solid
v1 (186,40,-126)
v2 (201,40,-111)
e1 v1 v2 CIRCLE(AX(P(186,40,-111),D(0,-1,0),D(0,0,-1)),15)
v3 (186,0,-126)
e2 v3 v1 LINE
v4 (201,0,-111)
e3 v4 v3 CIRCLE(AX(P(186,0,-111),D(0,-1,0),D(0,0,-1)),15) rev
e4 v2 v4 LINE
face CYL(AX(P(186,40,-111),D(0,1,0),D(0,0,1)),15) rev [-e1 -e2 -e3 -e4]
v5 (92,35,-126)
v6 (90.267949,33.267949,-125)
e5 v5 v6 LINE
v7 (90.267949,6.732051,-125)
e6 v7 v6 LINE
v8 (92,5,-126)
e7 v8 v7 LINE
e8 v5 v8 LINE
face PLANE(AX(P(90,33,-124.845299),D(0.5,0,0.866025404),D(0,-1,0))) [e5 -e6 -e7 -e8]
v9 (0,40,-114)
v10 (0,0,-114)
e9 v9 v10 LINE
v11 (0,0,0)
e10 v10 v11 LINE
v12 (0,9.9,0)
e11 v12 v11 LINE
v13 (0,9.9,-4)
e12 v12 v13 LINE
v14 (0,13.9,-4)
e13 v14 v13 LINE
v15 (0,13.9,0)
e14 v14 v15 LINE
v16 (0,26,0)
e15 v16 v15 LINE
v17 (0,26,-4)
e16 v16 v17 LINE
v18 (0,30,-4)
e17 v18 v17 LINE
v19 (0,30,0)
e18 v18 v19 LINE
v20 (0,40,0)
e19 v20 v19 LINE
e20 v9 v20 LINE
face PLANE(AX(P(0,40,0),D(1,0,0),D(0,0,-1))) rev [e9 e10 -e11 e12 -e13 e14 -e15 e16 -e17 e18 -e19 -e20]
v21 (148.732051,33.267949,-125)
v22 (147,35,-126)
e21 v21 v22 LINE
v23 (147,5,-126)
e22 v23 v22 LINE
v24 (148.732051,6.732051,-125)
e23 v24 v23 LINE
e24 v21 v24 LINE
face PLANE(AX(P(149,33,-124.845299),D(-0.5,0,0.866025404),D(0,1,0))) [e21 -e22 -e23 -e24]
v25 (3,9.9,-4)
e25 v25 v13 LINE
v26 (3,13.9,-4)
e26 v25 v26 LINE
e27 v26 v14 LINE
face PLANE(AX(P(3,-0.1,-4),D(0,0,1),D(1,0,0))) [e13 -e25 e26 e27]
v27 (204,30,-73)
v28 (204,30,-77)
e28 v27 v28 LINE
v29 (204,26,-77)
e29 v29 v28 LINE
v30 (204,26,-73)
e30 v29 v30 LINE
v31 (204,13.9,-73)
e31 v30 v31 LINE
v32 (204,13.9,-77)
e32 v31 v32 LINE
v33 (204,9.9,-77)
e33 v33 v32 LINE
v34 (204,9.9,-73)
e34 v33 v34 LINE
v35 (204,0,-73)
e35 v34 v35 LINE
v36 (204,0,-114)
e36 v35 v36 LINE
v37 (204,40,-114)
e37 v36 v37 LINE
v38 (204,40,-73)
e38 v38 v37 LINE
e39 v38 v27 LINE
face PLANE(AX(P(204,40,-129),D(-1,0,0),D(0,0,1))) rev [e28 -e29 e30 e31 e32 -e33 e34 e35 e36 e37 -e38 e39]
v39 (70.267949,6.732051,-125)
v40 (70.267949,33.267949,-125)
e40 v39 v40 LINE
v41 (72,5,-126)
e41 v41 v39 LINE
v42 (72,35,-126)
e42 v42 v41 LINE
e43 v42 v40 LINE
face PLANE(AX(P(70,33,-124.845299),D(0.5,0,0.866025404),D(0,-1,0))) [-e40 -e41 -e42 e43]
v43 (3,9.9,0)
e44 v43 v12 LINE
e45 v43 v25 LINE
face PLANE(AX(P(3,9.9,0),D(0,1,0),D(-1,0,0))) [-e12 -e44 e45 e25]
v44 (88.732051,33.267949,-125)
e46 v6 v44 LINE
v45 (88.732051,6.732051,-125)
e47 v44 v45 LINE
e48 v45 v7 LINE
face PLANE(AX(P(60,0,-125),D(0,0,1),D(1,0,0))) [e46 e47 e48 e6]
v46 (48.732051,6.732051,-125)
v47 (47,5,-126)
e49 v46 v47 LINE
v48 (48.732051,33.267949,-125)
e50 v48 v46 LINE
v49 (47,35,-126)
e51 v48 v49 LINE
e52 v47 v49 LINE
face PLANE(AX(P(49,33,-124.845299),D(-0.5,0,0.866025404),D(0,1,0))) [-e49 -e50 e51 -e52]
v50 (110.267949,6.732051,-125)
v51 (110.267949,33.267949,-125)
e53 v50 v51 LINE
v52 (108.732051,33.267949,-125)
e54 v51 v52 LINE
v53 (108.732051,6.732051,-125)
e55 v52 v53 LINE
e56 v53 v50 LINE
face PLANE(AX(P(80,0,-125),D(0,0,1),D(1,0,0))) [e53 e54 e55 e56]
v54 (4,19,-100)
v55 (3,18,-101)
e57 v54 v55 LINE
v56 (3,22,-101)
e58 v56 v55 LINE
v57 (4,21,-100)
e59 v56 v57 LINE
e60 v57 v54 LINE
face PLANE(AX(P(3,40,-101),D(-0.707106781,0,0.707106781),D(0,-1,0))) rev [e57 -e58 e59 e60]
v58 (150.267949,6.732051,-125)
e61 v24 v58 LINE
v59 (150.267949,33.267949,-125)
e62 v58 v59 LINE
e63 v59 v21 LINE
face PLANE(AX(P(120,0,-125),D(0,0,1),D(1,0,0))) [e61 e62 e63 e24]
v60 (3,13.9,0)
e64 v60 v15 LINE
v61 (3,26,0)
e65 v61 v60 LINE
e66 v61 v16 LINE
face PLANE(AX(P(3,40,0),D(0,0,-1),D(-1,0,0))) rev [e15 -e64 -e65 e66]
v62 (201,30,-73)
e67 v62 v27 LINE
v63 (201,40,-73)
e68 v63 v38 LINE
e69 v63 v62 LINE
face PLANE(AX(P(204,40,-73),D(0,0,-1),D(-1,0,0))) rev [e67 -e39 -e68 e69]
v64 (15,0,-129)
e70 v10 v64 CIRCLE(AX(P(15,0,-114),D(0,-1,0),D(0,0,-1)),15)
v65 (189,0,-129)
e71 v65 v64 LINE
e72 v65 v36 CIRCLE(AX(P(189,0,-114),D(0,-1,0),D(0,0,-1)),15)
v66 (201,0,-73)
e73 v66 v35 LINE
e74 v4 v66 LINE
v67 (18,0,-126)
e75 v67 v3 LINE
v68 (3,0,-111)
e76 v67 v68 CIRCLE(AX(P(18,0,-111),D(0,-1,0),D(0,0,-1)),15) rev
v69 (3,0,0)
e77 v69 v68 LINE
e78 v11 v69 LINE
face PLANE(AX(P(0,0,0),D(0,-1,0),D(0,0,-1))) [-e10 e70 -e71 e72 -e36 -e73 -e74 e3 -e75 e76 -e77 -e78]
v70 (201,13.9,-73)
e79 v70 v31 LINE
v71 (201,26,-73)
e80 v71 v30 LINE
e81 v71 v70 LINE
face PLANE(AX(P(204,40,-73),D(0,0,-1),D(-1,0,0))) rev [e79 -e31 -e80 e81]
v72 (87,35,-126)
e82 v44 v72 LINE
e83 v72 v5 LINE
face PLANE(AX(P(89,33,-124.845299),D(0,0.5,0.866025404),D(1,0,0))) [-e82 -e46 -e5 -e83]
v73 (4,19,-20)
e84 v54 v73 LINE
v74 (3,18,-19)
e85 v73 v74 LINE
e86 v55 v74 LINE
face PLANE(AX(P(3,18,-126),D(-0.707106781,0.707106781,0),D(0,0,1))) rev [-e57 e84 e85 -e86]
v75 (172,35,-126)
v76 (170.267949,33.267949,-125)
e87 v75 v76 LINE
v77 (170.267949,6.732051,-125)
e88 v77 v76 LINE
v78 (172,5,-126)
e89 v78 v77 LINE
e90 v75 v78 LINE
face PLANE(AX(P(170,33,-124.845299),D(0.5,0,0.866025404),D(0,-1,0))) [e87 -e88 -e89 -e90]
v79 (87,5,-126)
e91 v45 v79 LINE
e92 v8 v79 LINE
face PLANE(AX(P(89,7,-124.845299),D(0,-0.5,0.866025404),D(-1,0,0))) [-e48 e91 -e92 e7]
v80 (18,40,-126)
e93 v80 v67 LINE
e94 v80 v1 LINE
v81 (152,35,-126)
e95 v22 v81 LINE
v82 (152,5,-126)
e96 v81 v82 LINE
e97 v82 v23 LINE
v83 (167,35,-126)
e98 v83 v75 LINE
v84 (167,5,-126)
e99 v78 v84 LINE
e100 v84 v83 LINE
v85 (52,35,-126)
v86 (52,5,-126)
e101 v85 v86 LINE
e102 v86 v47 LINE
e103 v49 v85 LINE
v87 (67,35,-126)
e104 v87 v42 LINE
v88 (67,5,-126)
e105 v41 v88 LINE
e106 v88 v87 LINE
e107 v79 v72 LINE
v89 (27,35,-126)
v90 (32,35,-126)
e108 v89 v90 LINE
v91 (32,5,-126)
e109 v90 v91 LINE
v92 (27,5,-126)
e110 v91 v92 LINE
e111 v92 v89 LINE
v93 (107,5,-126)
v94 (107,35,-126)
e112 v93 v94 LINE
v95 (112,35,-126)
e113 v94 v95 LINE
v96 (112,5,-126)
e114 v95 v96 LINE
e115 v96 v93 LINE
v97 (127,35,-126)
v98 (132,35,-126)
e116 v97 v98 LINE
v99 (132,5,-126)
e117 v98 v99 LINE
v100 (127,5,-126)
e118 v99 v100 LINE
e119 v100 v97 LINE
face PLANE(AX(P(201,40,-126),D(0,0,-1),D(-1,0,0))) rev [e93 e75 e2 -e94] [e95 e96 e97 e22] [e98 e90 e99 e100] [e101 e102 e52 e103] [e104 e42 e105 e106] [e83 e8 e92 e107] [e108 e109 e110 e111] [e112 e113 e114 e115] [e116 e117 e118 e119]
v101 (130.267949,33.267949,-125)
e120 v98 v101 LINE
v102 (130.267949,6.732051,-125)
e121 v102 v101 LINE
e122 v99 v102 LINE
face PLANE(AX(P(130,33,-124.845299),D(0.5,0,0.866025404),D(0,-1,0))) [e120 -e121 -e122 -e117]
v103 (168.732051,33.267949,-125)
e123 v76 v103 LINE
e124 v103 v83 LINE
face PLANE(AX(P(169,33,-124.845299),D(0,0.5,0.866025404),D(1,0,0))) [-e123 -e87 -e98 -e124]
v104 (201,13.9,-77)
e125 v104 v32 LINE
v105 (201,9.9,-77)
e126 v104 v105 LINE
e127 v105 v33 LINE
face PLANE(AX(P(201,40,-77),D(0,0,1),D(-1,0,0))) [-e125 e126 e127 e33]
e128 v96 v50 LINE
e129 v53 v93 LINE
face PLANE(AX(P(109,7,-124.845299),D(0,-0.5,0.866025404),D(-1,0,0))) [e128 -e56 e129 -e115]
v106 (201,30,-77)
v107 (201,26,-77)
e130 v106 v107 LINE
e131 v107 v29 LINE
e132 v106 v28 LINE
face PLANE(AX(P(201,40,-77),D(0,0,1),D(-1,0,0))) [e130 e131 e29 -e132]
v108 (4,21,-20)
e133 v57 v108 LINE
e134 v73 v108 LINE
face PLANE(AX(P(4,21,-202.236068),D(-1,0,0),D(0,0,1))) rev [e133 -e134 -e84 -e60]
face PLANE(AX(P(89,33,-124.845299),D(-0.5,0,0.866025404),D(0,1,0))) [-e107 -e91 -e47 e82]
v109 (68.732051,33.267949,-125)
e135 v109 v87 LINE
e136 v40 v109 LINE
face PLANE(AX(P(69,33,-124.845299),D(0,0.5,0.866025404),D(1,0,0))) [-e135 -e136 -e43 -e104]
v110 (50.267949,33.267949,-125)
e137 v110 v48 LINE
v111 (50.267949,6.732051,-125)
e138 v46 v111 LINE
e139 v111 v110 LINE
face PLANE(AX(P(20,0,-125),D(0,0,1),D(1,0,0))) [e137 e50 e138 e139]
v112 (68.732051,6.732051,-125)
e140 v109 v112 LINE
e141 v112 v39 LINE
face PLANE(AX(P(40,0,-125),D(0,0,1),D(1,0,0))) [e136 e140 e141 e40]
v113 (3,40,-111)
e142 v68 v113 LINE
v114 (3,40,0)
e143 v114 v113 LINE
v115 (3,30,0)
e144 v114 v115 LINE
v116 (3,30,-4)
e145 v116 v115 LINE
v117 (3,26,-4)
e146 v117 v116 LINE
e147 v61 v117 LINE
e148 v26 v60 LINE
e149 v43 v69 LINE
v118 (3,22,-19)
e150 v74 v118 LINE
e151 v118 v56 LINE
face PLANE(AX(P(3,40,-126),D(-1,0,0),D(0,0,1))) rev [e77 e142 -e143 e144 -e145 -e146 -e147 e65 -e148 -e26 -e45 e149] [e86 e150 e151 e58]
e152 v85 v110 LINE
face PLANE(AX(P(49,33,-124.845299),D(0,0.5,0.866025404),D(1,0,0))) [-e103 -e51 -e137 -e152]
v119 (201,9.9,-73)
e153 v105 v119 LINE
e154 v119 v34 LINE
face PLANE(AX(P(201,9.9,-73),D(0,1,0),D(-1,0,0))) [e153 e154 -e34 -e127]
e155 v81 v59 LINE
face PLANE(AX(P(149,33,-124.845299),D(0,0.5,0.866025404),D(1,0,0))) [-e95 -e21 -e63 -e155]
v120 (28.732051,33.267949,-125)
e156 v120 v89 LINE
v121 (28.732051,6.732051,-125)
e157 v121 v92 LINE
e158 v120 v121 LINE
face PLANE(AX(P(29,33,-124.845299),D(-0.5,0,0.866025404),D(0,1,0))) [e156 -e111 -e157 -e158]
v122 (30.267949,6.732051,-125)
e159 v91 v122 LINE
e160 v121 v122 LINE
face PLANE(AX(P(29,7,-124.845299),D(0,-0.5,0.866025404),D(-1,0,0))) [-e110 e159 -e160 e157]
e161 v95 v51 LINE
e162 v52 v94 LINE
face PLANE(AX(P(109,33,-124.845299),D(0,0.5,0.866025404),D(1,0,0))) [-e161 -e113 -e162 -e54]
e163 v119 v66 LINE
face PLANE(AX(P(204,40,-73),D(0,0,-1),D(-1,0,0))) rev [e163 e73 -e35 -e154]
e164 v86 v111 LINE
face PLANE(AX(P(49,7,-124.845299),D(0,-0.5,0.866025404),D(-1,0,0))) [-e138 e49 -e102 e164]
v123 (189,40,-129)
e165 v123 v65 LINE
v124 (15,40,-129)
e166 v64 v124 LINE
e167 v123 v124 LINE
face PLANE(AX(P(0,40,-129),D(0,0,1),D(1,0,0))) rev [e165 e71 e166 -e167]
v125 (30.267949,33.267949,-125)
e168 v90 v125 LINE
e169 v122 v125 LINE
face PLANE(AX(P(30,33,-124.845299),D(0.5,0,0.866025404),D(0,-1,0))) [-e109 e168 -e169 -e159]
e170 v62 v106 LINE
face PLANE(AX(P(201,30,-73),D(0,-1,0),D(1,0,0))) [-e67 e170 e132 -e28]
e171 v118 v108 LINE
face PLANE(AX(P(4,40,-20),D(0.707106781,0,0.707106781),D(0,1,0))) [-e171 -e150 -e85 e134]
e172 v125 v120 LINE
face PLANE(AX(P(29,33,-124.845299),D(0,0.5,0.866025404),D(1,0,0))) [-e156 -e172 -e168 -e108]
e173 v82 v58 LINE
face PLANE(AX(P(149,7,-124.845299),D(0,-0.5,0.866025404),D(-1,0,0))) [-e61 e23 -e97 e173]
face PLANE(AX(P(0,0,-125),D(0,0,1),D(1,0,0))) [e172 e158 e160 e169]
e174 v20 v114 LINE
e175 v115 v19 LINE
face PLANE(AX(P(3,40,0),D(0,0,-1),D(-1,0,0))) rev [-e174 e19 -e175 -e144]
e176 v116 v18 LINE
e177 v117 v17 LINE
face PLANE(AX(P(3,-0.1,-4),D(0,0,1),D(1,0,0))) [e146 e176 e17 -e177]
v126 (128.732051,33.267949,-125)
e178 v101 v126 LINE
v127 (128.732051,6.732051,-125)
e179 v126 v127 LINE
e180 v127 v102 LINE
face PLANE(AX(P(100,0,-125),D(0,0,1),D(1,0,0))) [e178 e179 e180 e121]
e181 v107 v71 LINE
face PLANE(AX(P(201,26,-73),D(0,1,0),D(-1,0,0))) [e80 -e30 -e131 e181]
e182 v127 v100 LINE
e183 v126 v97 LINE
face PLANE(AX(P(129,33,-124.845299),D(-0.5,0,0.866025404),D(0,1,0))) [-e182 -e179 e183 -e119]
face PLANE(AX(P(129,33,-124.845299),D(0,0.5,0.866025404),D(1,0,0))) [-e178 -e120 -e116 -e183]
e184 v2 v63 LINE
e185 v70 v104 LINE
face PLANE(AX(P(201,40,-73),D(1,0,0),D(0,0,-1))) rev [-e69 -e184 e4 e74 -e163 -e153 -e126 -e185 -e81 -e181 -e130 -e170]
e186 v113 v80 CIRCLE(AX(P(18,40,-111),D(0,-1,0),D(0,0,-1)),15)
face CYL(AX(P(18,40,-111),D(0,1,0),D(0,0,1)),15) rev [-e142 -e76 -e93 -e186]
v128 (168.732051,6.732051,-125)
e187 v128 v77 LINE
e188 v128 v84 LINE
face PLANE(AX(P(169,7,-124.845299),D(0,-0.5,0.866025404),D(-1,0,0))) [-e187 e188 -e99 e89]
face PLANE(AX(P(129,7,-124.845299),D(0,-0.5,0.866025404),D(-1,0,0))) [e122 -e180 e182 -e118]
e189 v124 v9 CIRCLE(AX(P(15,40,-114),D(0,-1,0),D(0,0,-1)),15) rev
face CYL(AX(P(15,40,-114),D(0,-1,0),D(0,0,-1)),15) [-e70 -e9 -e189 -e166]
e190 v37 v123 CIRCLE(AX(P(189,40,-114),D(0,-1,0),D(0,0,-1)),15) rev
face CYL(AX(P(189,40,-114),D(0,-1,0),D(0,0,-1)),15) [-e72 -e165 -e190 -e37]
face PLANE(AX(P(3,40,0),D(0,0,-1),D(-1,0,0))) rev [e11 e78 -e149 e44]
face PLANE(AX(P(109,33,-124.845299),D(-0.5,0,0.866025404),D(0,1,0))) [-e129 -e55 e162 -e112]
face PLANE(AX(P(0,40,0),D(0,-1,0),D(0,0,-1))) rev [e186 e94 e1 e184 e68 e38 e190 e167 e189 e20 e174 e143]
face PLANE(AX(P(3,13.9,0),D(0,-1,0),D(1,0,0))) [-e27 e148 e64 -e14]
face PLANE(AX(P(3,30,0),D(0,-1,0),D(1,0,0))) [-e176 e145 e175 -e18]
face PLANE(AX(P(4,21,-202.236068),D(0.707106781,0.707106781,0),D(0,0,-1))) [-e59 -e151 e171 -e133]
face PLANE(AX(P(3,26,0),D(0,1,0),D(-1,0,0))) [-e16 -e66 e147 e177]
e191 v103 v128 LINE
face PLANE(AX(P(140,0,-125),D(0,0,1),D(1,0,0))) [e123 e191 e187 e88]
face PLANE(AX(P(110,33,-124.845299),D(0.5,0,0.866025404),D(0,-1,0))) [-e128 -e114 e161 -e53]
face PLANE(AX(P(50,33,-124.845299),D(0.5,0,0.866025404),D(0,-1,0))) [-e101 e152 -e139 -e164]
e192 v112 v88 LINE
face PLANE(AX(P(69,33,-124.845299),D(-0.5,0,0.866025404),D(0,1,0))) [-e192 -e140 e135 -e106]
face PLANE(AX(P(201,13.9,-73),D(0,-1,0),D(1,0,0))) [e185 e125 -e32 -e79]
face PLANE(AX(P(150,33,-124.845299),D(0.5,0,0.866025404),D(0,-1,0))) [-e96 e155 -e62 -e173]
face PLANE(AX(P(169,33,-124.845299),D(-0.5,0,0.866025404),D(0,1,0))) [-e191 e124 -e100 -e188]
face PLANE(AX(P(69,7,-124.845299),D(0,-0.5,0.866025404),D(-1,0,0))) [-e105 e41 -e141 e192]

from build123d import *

# Parameters (mm, degrees)
EXTRUDE_1_DEPTH              = 40
FILLET_1_R                   = 15
SKETCH_2_W                   = 1
SKETCH_2_H                   = 26
EXTRUDE_2_DEPTH              = 1
CHAMFER_1_SIZE               = 2
CHAMFER_1_SIZE_2             = 1.154700538
PATTERN_LINEAR_1_OUTLINE_W   = 1.535898384
PATTERN_LINEAR_1_OUTLINE_H   = 26.535898384
PATTERN_LINEAR_1_DEPTH       = 1
PATTERN_LINEAR_1_TAPER       = -60
PATTERN_LINEAR_1_2_OUTLINE_W = 1.535898384
PATTERN_LINEAR_1_2_OUTLINE_H = 26.535898384
PATTERN_LINEAR_1_2_DEPTH     = 1
PATTERN_LINEAR_1_2_TAPER     = -60
PATTERN_LINEAR_1_3_OUTLINE_W = 1.535898384
PATTERN_LINEAR_1_3_OUTLINE_H = 26.535898384
PATTERN_LINEAR_1_3_DEPTH     = 1
PATTERN_LINEAR_1_3_TAPER     = -60
PATTERN_LINEAR_1_4_OUTLINE_W = 1.535898384
PATTERN_LINEAR_1_4_OUTLINE_H = 26.535898384
PATTERN_LINEAR_1_4_DEPTH     = 1
PATTERN_LINEAR_1_4_TAPER     = -60
PATTERN_LINEAR_1_5_OUTLINE_W = 1.535898384
PATTERN_LINEAR_1_5_OUTLINE_H = 26.535898384
PATTERN_LINEAR_1_5_DEPTH     = 1
PATTERN_LINEAR_1_5_TAPER     = -60
PATTERN_LINEAR_1_6_OUTLINE_W = 1.535898384
PATTERN_LINEAR_1_6_OUTLINE_H = 26.535898384
PATTERN_LINEAR_1_6_DEPTH     = 1
PATTERN_LINEAR_1_6_TAPER     = -60
PATTERN_LINEAR_1_7_OUTLINE_W = 1.535898384
PATTERN_LINEAR_1_7_OUTLINE_H = 26.535898384
PATTERN_LINEAR_1_7_DEPTH     = 1
PATTERN_LINEAR_1_7_TAPER     = -60
SKETCH_4_W                   = 1
SKETCH_4_H                   = 2
EXTRUDE_3_DEPTH              = 100
SKETCH_4_3_W                 = 1
SKETCH_4_3_H                 = 2
CUT_EXTRUDE_1_DEPTH          = 20
CHAMFER_3_SIZE               = 1
OTHER_START                  = 9.9
OTHER_3_OUTLINE_W            = 3
OTHER_3_OUTLINE_H            = 4
OTHER_3_DEPTH                = 4
OTHER_START_2                = 26
OTHER_3_2_OUTLINE_W          = 3
OTHER_3_2_OUTLINE_H          = 4
OTHER_3_2_DEPTH              = 4
OTHER_4_OUTLINE_W            = 3
OTHER_4_OUTLINE_H            = 4
OTHER_4_DEPTH                = 4
OTHER_4_2_OUTLINE_W          = 3
OTHER_4_2_OUTLINE_H          = 4
OTHER_4_2_DEPTH              = 4


# Read off the part's stored shape, not the designer's step: Линейный массив1, Отступ3, Отступ4
# Some blends are built 0.0001 mm under size
with BuildPart() as part:
    # Эскиз1 → Бобышка-Вытянуть1 (new body)
    with BuildSketch(Plane(origin=(0, 0, 0), x_dir=(1, 0, 0), z_dir=(0, 1, 0))):
        Polygon((0, 0), (0, 129), (204, 129), (204, 73), (201, 73), (201, 126), (3, 126), (3, 0), align=None)
    extrude(amount=EXTRUDE_1_DEPTH)

    # Скругление1
    fillet_1_edges = [part.edges().sort_by_distance(p)[0] for p in [
        (0, 20, -129),
        (204, 20, -129),
        (201, 20, -126),
        (3, 20, -126),
    ]]
    fillet(fillet_1_edges, radius=FILLET_1_R)

    # Эскиз2 → Бобышка-Вытянуть2 (add)
    with BuildSketch(Plane.XY.offset(-126)):
        with Locations((29.5, 20)):
            Rectangle(SKETCH_2_W, SKETCH_2_H)
    extrude(amount=EXTRUDE_2_DEPTH)

    # Фаска1
    # the kernel refuses this chamfer: 2, 1.154700538 mm, written as the material it adds along each edge
    with BuildSketch(Plane(origin=(30, 7, -126), x_dir=(0, -0.9998132206222077, -0.019326765612703727), z_dir=(-1, 0, 0))) as chamfer_1_piece_1_section:
        Polygon((CHAMFER_1_SIZE * 0.999813220622, CHAMFER_1_SIZE * 0.0193267656127), (-CHAMFER_1_SIZE_2 * 0.0193267656191, CHAMFER_1_SIZE_2 * 0.999813220951), (0, 0), align=None)
    chamfer_1_piece_1 = extrude(amount=1, mode=Mode.PRIVATE)
    chamfer_1_piece_1 = split(chamfer_1_piece_1, bisect_by=Plane(origin=(29.5, 6.310262321, -125), z_dir=(0, 0, -1)), keep=Keep.TOP, mode=Mode.PRIVATE)
    add(chamfer_1_piece_1)
    with BuildSketch(Plane(origin=(29, 7, -126), x_dir=(-0.9998132206222079, 0, -0.019326765612703557), z_dir=(0, 1, 0))) as chamfer_1_piece_2_section:
        Polygon((CHAMFER_1_SIZE * 0.999813220622, CHAMFER_1_SIZE * 0.0193267656127), (-CHAMFER_1_SIZE_2 * 0.0193267656191, CHAMFER_1_SIZE_2 * 0.999813220951), (0, 0), align=None)
    chamfer_1_piece_2 = extrude(amount=26, mode=Mode.PRIVATE)
    chamfer_1_piece_2 = split(chamfer_1_piece_2, bisect_by=Plane(origin=(28.310262321, 20, -125), z_dir=(0, 0, -1)), keep=Keep.TOP, mode=Mode.PRIVATE)
    add(chamfer_1_piece_2)
    with BuildSketch(Plane(origin=(29, 33, -126), x_dir=(0, 0.9998132206222079, -0.019326765612703755), z_dir=(1, 0, 0))) as chamfer_1_piece_3_section:
        Polygon((CHAMFER_1_SIZE * 0.999813220622, CHAMFER_1_SIZE * 0.0193267656127), (-CHAMFER_1_SIZE_2 * 0.0193267656191, CHAMFER_1_SIZE_2 * 0.999813220951), (0, 0), align=None)
    chamfer_1_piece_3 = extrude(amount=1, mode=Mode.PRIVATE)
    chamfer_1_piece_3 = split(chamfer_1_piece_3, bisect_by=Plane(origin=(29.5, 33.689737679, -125), z_dir=(0, 0, -1)), keep=Keep.TOP, mode=Mode.PRIVATE)
    add(chamfer_1_piece_3)
    with BuildSketch(Plane(origin=(30, 33, -126), x_dir=(0.9998132206222077, 0, -0.019326765612703883), z_dir=(0, -1, 0))) as chamfer_1_piece_4_section:
        Polygon((CHAMFER_1_SIZE * 0.999813220622, CHAMFER_1_SIZE * 0.0193267656127), (-CHAMFER_1_SIZE_2 * 0.0193267656191, CHAMFER_1_SIZE_2 * 0.999813220951), (0, 0), align=None)
    chamfer_1_piece_4 = extrude(amount=26, mode=Mode.PRIVATE)
    chamfer_1_piece_4 = split(chamfer_1_piece_4, bisect_by=Plane(origin=(30.689737679, 20, -125), z_dir=(0, 0, -1)), keep=Keep.TOP, mode=Mode.PRIVATE)
    add(chamfer_1_piece_4)
    with BuildSketch(Plane(origin=(35.174171509, 7, -126), x_dir=(0, -0.9998132206222077, -0.019326765612703727), z_dir=(-1, 0, 0))) as chamfer_1_piece_5a_section:
        Polygon((CHAMFER_1_SIZE * 0.999813220622, CHAMFER_1_SIZE * 0.0193267656127), (-CHAMFER_1_SIZE_2 * 0.0193267656191, CHAMFER_1_SIZE_2 * 0.999813220951), (0, 0), align=None)
    chamfer_1_piece_5a = extrude(amount=6.174171509, mode=Mode.PRIVATE)
    chamfer_1_piece_5a = split(chamfer_1_piece_5a, bisect_by=Plane(origin=(30, 6.310262321, -125.650398981), z_dir=(1, 0, 0)), keep=Keep.TOP, mode=Mode.PRIVATE)
    chamfer_1_piece_5a = split(chamfer_1_piece_5a, bisect_by=Plane(origin=(32.587085755, 6.310262321, -125), z_dir=(0, 0, -1)), keep=Keep.TOP, mode=Mode.PRIVATE)
    with BuildSketch(Plane(origin=(30, 33, -126), x_dir=(0.9998132206222077, 0, -0.019326765612703883), z_dir=(0, -1, 0))) as chamfer_1_piece_5b_section:
        Polygon((CHAMFER_1_SIZE * 0.999813220622, CHAMFER_1_SIZE * 0.0193267656127), (-CHAMFER_1_SIZE_2 * 0.0193267656191, CHAMFER_1_SIZE_2 * 0.999813220951), (0, 0), align=None)
    chamfer_1_piece_5b = extrude(amount=31.174171509, mode=Mode.PRIVATE)
    chamfer_1_piece_5b = split(chamfer_1_piece_5b, bisect_by=Plane(origin=(30.689737679, 7, -125.650398981), z_dir=(0, -1, 0)), keep=Keep.TOP, mode=Mode.PRIVATE)
    chamfer_1_piece_5b = split(chamfer_1_piece_5b, bisect_by=Plane(origin=(30.689737679, 4.412914245, -125), z_dir=(0, 0, -1)), keep=Keep.TOP, mode=Mode.PRIVATE)
    chamfer_1_piece_5 = chamfer_1_piece_5a & chamfer_1_piece_5b
    add(chamfer_1_piece_5)
    with BuildSketch(Plane(origin=(29, 1.825828491, -126), x_dir=(-0.9998132206222077, 0, -0.019326765612703717), z_dir=(0, 1, 0))) as chamfer_1_piece_6a_section:
        Polygon((CHAMFER_1_SIZE * 0.999813220622, CHAMFER_1_SIZE * 0.0193267656127), (-CHAMFER_1_SIZE_2 * 0.019326765619, CHAMFER_1_SIZE_2 * 0.999813220951), (0, 0), align=None)
    chamfer_1_piece_6a = extrude(amount=31.174171509, mode=Mode.PRIVATE)
    chamfer_1_piece_6a = split(chamfer_1_piece_6a, bisect_by=Plane(origin=(28.310262321, 7, -125.650398981), z_dir=(0, -1, 0)), keep=Keep.TOP, mode=Mode.PRIVATE)
    chamfer_1_piece_6a = split(chamfer_1_piece_6a, bisect_by=Plane(origin=(28.310262321, 4.412914245, -125), z_dir=(0, 0, -1)), keep=Keep.TOP, mode=Mode.PRIVATE)
    with BuildSketch(Plane(origin=(30, 7, -126), x_dir=(0, -0.9998132206222077, -0.019326765612703727), z_dir=(-1, 0, 0))) as chamfer_1_piece_6b_section:
        Polygon((CHAMFER_1_SIZE * 0.999813220622, CHAMFER_1_SIZE * 0.0193267656127), (-CHAMFER_1_SIZE_2 * 0.0193267656191, CHAMFER_1_SIZE_2 * 0.999813220951), (0, 0), align=None)
    chamfer_1_piece_6b = extrude(amount=6.174171509, mode=Mode.PRIVATE)
    chamfer_1_piece_6b = split(chamfer_1_piece_6b, bisect_by=Plane(origin=(29, 6.310262321, -125.650398981), z_dir=(-1, 0, 0)), keep=Keep.TOP, mode=Mode.PRIVATE)
    chamfer_1_piece_6b = split(chamfer_1_piece_6b, bisect_by=Plane(origin=(26.412914245, 6.310262321, -125), z_dir=(0, 0, -1)), keep=Keep.TOP, mode=Mode.PRIVATE)
    chamfer_1_piece_6 = chamfer_1_piece_6a & chamfer_1_piece_6b
    add(chamfer_1_piece_6)
    with BuildSketch(Plane(origin=(29, 7, -126), x_dir=(-0.9998132206222079, 0, -0.019326765612703557), z_dir=(0, 1, 0))) as chamfer_1_piece_7a_section:
        Polygon((CHAMFER_1_SIZE * 0.999813220622, CHAMFER_1_SIZE * 0.0193267656127), (-CHAMFER_1_SIZE_2 * 0.0193267656191, CHAMFER_1_SIZE_2 * 0.999813220951), (0, 0), align=None)
    chamfer_1_piece_7a = extrude(amount=31.174171509, mode=Mode.PRIVATE)
    chamfer_1_piece_7a = split(chamfer_1_piece_7a, bisect_by=Plane(origin=(28.310262321, 33, -125.650398981), z_dir=(0, 1, 0)), keep=Keep.TOP, mode=Mode.PRIVATE)
    chamfer_1_piece_7a = split(chamfer_1_piece_7a, bisect_by=Plane(origin=(28.310262321, 35.587085755, -125), z_dir=(0, 0, -1)), keep=Keep.TOP, mode=Mode.PRIVATE)
    with BuildSketch(Plane(origin=(23.825828491, 33, -126), x_dir=(0, 0.9998132206222079, -0.019326765612703755), z_dir=(1, 0, 0))) as chamfer_1_piece_7b_section:
        Polygon((CHAMFER_1_SIZE * 0.999813220622, CHAMFER_1_SIZE * 0.0193267656127), (-CHAMFER_1_SIZE_2 * 0.0193267656191, CHAMFER_1_SIZE_2 * 0.999813220951), (0, 0), align=None)
    chamfer_1_piece_7b = extrude(amount=6.174171509, mode=Mode.PRIVATE)
    chamfer_1_piece_7b = split(chamfer_1_piece_7b, bisect_by=Plane(origin=(29, 33.689737679, -125.650398981), z_dir=(-1, 0, 0)), keep=Keep.TOP, mode=Mode.PRIVATE)
    chamfer_1_piece_7b = split(chamfer_1_piece_7b, bisect_by=Plane(origin=(26.412914245, 33.689737679, -125), z_dir=(0, 0, -1)), keep=Keep.TOP, mode=Mode.PRIVATE)
    chamfer_1_piece_7 = chamfer_1_piece_7a & chamfer_1_piece_7b
    add(chamfer_1_piece_7)
    with BuildSketch(Plane(origin=(30, 38.174171509, -126), x_dir=(0.9998132206222079, 0, -0.019326765612703755), z_dir=(0, -1, 0))) as chamfer_1_piece_8a_section:
        Polygon((CHAMFER_1_SIZE * 0.999813220622, CHAMFER_1_SIZE * 0.0193267656127), (-CHAMFER_1_SIZE_2 * 0.019326765619, CHAMFER_1_SIZE_2 * 0.999813220951), (0, 0), align=None)
    chamfer_1_piece_8a = extrude(amount=31.174171509, mode=Mode.PRIVATE)
    chamfer_1_piece_8a = split(chamfer_1_piece_8a, bisect_by=Plane(origin=(30.689737679, 33, -125.650398981), z_dir=(0, 1, 0)), keep=Keep.TOP, mode=Mode.PRIVATE)
    chamfer_1_piece_8a = split(chamfer_1_piece_8a, bisect_by=Plane(origin=(30.689737679, 35.587085755, -125), z_dir=(0, 0, -1)), keep=Keep.TOP, mode=Mode.PRIVATE)
    with BuildSketch(Plane(origin=(29, 33, -126), x_dir=(0, 0.9998132206222079, -0.019326765612703755), z_dir=(1, 0, 0))) as chamfer_1_piece_8b_section:
        Polygon((CHAMFER_1_SIZE * 0.999813220622, CHAMFER_1_SIZE * 0.0193267656127), (-CHAMFER_1_SIZE_2 * 0.0193267656191, CHAMFER_1_SIZE_2 * 0.999813220951), (0, 0), align=None)
    chamfer_1_piece_8b = extrude(amount=6.174171509, mode=Mode.PRIVATE)
    chamfer_1_piece_8b = split(chamfer_1_piece_8b, bisect_by=Plane(origin=(30, 33.689737679, -125.650398981), z_dir=(1, 0, 0)), keep=Keep.TOP, mode=Mode.PRIVATE)
    chamfer_1_piece_8b = split(chamfer_1_piece_8b, bisect_by=Plane(origin=(32.587085755, 33.689737679, -125), z_dir=(0, 0, -1)), keep=Keep.TOP, mode=Mode.PRIVATE)
    chamfer_1_piece_8 = chamfer_1_piece_8a & chamfer_1_piece_8b
    add(chamfer_1_piece_8)

    # Линейный массив1 outline → Линейный массив1 (add)
    with BuildSketch(Plane.XY.offset(-125)):
        with Locations((169.5, 20)):
            Rectangle(PATTERN_LINEAR_1_OUTLINE_W, PATTERN_LINEAR_1_OUTLINE_H)
    extrude(amount=-PATTERN_LINEAR_1_DEPTH, taper=PATTERN_LINEAR_1_TAPER)

    # Pattern Linear 1 2 outline → Pattern Linear 1 2 (add)
    with BuildSketch(Plane.XY.offset(-125)):
        with Locations((149.5, 20)):
            Rectangle(PATTERN_LINEAR_1_2_OUTLINE_W, PATTERN_LINEAR_1_2_OUTLINE_H)
    extrude(amount=-PATTERN_LINEAR_1_2_DEPTH, taper=PATTERN_LINEAR_1_2_TAPER)

    # Pattern Linear 1 3 outline → Pattern Linear 1 3 (add)
    with BuildSketch(Plane.XY.offset(-125)):
        with Locations((129.5, 20)):
            Rectangle(PATTERN_LINEAR_1_3_OUTLINE_W, PATTERN_LINEAR_1_3_OUTLINE_H)
    extrude(amount=-PATTERN_LINEAR_1_3_DEPTH, taper=PATTERN_LINEAR_1_3_TAPER)

    # Pattern Linear 1 4 outline → Pattern Linear 1 4 (add)
    with BuildSketch(Plane.XY.offset(-125)):
        with Locations((109.5, 20)):
            Rectangle(PATTERN_LINEAR_1_4_OUTLINE_W, PATTERN_LINEAR_1_4_OUTLINE_H)
    extrude(amount=-PATTERN_LINEAR_1_4_DEPTH, taper=PATTERN_LINEAR_1_4_TAPER)

    # Pattern Linear 1 5 outline → Pattern Linear 1 5 (add)
    with BuildSketch(Plane.XY.offset(-125)):
        with Locations((89.5, 20)):
            Rectangle(PATTERN_LINEAR_1_5_OUTLINE_W, PATTERN_LINEAR_1_5_OUTLINE_H)
    extrude(amount=-PATTERN_LINEAR_1_5_DEPTH, taper=PATTERN_LINEAR_1_5_TAPER)

    # Pattern Linear 1 6 outline → Pattern Linear 1 6 (add)
    with BuildSketch(Plane.XY.offset(-125)):
        with Locations((69.5, 20)):
            Rectangle(PATTERN_LINEAR_1_6_OUTLINE_W, PATTERN_LINEAR_1_6_OUTLINE_H)
    extrude(amount=-PATTERN_LINEAR_1_6_DEPTH, taper=PATTERN_LINEAR_1_6_TAPER)

    # Pattern Linear 1 7 outline → Pattern Linear 1 7 (add)
    with BuildSketch(Plane.XY.offset(-125)):
        with Locations((49.5, 20)):
            Rectangle(PATTERN_LINEAR_1_7_OUTLINE_W, PATTERN_LINEAR_1_7_OUTLINE_H)
    extrude(amount=-PATTERN_LINEAR_1_7_DEPTH, taper=PATTERN_LINEAR_1_7_TAPER)

    # Эскиз4 → Бобышка-Вытянуть3 (add)
    with BuildSketch(Plane.XY):
        with Locations((3.5, 20)):
            Rectangle(SKETCH_4_W, SKETCH_4_H)
    extrude(amount=-EXTRUDE_3_DEPTH)

    # Эскиз4<3> → Вырез-Вытянуть1 (cut)
    with BuildSketch(Plane.XY):
        with Locations((3.5, 20)):
            Rectangle(SKETCH_4_3_W, SKETCH_4_3_H)
    extrude(amount=-CUT_EXTRUDE_1_DEPTH, mode=Mode.SUBTRACT)

    # Фаска3
    chamfer_3_edges = [part.edges().sort_by_distance(p)[0] for p in [
        (3, 20, -100),
        (3, 21, -60),
        (3, 20, -20),
        (3, 19, -60),
    ]]
    chamfer(chamfer_3_edges, length=CHAMFER_3_SIZE - 0.0001)  # a hair under: the kernel refuses the full size

    # Отступ3 outline → Отступ3 (cut)
    with BuildSketch(Plane(origin=(0, 0, 0), x_dir=(1, 0, 0), z_dir=(0, 1, 0)).offset(OTHER_START)):
        with Locations((202.5, 75)):
            Rectangle(OTHER_3_OUTLINE_W, OTHER_3_OUTLINE_H)
    extrude(amount=OTHER_3_DEPTH, mode=Mode.SUBTRACT)

    # Other 3 2 outline → Other 3 2 (cut)
    with BuildSketch(Plane(origin=(0, 0, 0), x_dir=(1, 0, 0), z_dir=(0, 1, 0)).offset(OTHER_START_2)):
        with Locations((202.5, 75)):
            Rectangle(OTHER_3_2_OUTLINE_W, OTHER_3_2_OUTLINE_H)
    extrude(amount=OTHER_3_2_DEPTH, mode=Mode.SUBTRACT)

    # Отступ4 outline → Отступ4 (cut)
    with BuildSketch(Plane(origin=(0, 0, 0), x_dir=(1, 0, 0), z_dir=(0, 1, 0)).offset(OTHER_START)):
        with Locations((1.5, 2)):
            Rectangle(OTHER_4_OUTLINE_W, OTHER_4_OUTLINE_H)
    extrude(amount=OTHER_4_DEPTH, mode=Mode.SUBTRACT)

    # Other 4 2 outline → Other 4 2 (cut)
    with BuildSketch(Plane(origin=(0, 0, 0), x_dir=(1, 0, 0), z_dir=(0, 1, 0)).offset(OTHER_START_2)):
        with Locations((1.5, 2)):
            Rectangle(OTHER_4_2_OUTLINE_W, OTHER_4_2_OUTLINE_H)
    extrude(amount=OTHER_4_2_DEPTH, mode=Mode.SUBTRACT)


solid = part.part
